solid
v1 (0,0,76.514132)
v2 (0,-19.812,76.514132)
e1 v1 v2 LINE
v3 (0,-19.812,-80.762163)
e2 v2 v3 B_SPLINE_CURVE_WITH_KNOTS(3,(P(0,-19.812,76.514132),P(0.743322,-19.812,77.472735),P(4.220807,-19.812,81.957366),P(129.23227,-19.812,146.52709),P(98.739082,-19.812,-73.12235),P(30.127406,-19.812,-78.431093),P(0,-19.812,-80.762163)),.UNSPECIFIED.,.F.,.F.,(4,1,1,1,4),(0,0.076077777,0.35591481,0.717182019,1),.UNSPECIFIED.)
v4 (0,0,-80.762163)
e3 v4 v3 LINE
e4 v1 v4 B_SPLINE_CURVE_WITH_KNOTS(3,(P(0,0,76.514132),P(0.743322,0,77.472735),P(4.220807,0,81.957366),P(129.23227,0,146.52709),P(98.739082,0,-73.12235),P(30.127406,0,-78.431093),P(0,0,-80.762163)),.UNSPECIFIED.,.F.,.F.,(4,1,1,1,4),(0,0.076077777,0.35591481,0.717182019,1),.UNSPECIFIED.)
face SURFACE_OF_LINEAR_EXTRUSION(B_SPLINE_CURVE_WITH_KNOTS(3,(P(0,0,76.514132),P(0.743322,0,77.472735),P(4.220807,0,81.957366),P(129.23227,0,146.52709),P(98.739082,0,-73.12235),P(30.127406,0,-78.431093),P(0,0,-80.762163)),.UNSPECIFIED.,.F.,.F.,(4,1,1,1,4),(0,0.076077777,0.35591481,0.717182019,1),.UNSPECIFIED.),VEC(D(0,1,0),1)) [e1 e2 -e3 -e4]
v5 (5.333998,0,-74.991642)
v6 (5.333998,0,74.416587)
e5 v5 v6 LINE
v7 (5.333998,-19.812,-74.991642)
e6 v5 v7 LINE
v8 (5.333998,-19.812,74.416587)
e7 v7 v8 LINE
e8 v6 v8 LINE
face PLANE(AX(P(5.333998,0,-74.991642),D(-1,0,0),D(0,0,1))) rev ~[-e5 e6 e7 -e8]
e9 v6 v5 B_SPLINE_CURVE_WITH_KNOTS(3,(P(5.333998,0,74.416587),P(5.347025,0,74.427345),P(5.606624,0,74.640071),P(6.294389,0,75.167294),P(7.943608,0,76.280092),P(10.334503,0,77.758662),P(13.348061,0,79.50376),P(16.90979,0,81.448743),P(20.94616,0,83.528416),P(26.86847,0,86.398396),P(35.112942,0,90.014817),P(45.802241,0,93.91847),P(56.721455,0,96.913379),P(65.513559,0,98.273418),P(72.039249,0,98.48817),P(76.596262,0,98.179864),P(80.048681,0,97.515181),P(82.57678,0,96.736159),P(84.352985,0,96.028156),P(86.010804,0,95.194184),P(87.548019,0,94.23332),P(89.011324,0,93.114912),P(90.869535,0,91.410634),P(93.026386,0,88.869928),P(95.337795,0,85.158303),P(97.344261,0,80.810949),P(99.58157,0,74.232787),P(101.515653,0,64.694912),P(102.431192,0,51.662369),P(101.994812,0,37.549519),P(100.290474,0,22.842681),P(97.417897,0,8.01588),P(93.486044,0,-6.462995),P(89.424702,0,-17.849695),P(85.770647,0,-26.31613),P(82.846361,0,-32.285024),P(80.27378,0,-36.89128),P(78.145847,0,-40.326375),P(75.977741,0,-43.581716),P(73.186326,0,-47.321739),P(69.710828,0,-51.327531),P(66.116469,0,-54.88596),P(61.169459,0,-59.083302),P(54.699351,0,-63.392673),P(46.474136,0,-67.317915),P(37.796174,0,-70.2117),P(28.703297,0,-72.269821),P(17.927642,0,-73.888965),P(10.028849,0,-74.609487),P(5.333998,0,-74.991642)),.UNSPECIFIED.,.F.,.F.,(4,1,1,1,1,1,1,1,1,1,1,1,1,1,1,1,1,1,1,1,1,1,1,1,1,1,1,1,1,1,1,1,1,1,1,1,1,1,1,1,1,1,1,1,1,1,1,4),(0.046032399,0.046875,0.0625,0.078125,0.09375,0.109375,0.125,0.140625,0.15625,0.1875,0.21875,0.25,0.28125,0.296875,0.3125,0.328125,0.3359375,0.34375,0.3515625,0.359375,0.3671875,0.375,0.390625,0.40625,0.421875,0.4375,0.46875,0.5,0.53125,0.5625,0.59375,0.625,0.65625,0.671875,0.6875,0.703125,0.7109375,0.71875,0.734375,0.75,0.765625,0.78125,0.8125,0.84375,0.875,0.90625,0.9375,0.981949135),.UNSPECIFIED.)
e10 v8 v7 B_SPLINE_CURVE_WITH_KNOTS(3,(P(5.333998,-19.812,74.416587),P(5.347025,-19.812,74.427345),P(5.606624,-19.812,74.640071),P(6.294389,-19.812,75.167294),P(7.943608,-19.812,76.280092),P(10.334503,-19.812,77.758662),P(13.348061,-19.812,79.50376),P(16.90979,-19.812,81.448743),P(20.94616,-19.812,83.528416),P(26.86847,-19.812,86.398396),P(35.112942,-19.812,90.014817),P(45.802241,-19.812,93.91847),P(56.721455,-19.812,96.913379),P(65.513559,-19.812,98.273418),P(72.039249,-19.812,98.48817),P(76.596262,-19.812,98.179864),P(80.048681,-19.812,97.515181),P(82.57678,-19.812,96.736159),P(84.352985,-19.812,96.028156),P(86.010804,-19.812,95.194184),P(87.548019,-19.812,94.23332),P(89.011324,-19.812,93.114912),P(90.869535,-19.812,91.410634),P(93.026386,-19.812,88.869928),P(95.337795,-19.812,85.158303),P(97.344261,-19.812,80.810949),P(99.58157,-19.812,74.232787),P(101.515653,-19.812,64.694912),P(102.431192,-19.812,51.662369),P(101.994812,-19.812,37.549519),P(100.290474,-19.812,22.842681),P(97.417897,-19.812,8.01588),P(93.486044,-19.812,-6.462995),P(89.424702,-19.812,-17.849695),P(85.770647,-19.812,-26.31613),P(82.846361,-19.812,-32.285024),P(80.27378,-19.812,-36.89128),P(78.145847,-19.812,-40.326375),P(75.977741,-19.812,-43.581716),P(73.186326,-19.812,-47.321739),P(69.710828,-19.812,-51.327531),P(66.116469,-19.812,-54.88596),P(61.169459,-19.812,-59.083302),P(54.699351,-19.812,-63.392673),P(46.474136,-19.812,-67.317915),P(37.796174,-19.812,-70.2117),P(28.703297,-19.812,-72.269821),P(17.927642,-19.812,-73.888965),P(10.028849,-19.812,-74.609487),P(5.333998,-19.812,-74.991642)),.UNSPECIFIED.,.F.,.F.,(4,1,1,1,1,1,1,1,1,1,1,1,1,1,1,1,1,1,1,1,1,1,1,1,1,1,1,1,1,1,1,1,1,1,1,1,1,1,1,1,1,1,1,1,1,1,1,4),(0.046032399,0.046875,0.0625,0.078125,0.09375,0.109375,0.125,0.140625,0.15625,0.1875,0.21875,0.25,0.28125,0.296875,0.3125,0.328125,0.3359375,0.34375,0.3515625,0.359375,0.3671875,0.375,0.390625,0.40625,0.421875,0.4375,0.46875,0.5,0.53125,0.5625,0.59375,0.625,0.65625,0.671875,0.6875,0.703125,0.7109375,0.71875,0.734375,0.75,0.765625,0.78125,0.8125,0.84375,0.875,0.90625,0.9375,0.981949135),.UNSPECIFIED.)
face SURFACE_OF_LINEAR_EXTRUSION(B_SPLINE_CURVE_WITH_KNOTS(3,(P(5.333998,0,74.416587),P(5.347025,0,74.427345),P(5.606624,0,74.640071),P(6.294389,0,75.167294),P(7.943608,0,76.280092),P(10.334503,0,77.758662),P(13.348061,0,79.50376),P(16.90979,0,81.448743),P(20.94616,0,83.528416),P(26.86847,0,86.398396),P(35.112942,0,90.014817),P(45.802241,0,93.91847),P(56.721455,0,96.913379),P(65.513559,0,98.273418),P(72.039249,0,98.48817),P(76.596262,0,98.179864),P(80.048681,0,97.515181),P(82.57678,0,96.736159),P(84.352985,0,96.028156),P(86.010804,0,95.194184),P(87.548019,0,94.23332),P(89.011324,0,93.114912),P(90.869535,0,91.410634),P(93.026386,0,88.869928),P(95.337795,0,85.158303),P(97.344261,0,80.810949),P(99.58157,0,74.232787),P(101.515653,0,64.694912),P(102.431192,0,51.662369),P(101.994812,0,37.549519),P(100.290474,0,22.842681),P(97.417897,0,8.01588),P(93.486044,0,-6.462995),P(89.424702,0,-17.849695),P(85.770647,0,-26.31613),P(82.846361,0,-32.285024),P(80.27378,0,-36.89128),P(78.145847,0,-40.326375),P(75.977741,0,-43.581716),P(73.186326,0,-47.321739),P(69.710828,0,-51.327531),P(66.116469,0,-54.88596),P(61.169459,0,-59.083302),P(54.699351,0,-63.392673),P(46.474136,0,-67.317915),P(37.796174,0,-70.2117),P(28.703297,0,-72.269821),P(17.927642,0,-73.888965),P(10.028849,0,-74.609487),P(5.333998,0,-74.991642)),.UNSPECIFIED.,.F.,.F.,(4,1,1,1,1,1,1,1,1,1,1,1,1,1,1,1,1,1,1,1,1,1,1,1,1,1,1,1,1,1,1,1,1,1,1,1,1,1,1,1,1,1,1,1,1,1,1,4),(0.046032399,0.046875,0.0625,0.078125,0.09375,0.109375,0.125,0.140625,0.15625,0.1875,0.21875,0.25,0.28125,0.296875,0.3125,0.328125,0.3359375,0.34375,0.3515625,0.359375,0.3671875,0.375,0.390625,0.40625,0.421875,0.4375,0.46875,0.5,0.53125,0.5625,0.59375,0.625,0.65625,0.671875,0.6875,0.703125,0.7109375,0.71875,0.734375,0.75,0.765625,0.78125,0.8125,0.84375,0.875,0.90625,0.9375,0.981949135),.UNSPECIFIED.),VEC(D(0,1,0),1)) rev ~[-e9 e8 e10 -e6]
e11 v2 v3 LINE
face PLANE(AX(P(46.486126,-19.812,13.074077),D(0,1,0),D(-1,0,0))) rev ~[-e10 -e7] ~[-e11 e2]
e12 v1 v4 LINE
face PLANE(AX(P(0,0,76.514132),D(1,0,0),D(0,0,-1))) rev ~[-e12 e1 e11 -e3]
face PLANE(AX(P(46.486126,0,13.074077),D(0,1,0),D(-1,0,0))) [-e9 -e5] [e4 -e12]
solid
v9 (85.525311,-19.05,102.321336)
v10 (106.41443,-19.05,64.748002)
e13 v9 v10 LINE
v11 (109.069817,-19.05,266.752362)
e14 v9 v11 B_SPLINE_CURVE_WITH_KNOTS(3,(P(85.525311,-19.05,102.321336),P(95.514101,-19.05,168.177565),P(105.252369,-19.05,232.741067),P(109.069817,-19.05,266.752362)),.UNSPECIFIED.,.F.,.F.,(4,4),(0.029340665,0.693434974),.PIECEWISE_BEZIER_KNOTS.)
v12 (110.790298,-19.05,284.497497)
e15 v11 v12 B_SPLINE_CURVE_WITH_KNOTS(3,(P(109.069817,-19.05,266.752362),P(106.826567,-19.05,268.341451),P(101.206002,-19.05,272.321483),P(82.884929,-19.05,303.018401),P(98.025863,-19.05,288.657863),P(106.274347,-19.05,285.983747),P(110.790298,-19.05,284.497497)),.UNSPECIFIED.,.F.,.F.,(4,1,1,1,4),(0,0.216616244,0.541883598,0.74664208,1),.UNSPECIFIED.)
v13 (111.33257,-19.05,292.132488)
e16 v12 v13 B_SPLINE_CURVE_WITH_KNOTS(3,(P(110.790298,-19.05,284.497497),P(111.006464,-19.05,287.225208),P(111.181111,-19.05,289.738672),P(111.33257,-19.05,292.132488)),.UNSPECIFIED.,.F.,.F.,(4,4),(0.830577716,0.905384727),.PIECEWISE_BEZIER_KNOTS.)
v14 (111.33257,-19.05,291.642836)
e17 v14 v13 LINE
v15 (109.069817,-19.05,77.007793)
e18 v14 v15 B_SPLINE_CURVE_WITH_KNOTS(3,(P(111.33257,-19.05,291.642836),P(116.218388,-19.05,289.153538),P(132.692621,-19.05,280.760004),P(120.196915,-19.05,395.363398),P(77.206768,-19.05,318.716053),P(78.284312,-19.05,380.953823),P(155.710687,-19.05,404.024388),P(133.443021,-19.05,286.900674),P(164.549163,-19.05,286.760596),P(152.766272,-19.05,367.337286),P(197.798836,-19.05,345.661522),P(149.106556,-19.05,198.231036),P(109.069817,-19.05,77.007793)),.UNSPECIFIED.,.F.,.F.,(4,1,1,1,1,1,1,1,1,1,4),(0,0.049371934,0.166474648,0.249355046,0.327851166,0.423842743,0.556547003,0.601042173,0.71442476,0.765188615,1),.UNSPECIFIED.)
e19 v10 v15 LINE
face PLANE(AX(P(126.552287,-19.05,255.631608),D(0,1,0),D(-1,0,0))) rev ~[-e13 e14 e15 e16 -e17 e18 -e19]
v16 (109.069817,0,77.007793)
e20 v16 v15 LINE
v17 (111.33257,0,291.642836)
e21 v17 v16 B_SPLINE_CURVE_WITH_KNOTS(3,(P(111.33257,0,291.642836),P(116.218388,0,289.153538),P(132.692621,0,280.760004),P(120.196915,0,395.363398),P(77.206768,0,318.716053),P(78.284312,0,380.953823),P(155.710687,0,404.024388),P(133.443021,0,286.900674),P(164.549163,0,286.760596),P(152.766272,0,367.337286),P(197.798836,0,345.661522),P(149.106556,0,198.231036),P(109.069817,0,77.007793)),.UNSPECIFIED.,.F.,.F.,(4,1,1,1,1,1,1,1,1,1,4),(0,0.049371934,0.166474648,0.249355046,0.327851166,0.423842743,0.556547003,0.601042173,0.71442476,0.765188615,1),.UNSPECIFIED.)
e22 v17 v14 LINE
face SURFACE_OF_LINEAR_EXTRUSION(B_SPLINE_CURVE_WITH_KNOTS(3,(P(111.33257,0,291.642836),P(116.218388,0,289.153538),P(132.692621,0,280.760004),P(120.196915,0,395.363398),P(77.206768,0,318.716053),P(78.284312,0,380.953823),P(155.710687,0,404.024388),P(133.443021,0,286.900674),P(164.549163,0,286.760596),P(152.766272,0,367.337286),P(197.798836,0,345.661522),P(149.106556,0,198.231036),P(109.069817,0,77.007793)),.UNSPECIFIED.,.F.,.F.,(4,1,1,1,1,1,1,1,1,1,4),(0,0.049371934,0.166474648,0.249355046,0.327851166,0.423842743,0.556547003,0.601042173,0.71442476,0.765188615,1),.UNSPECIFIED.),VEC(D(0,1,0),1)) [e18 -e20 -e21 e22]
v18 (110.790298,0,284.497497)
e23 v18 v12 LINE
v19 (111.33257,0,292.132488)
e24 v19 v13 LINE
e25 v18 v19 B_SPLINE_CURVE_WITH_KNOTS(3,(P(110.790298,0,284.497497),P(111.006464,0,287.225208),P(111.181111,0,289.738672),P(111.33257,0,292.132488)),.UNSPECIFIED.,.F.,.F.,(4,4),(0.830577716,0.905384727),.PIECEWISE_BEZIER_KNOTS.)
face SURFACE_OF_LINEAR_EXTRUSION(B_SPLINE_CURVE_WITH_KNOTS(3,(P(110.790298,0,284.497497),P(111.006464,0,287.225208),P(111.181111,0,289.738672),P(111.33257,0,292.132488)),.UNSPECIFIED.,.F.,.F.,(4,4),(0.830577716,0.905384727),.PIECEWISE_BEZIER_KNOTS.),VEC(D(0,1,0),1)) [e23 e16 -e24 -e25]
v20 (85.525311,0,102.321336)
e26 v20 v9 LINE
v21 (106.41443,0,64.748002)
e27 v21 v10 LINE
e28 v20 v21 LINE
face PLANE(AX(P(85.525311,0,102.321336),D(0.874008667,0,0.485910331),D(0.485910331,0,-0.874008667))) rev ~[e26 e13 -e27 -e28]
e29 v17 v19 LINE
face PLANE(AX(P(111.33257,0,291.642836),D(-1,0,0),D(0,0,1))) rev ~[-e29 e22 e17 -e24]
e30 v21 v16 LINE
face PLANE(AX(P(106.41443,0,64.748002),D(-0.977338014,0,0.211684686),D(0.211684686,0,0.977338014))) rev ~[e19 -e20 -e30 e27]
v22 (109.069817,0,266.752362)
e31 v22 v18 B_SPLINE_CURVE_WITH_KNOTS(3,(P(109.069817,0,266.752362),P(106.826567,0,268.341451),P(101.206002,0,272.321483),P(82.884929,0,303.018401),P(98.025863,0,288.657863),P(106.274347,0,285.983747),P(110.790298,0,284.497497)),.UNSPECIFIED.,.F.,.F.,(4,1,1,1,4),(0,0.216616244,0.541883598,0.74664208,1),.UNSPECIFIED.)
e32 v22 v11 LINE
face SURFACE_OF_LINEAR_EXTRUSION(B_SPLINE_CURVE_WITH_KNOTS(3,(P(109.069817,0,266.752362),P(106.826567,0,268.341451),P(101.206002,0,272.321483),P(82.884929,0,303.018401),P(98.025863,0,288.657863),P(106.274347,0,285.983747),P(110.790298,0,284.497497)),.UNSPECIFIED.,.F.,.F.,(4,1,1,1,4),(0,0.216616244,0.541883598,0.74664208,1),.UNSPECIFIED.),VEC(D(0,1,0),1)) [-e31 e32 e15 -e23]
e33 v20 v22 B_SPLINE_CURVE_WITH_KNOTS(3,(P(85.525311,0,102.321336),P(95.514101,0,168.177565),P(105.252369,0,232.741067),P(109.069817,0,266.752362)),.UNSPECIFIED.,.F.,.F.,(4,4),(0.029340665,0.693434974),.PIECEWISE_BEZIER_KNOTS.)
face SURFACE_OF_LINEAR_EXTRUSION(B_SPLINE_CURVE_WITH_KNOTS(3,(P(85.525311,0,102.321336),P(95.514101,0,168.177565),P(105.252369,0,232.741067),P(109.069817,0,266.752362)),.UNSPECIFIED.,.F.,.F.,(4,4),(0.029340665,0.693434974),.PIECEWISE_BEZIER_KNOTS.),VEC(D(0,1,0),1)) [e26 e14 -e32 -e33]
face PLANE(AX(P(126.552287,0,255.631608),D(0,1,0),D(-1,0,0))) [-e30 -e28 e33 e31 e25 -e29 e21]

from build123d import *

# Parameters (mm, degrees)
F1_DEPTH = 19.812
F3_DEPTH = 19.05


# Not quite as in the source:
# - ends of sketch curves that miss each other by under 0.0002 mm in the source are joined
# - the dataset's text gives a spline's control points without its knots; the knots are read off the source's solid


with BuildPart() as f1:
    # F0 (on Front) → F1 (new body)
    with BuildSketch(Plane.XZ):
        with BuildLine():
            add(Edge.make_bspline(
                [(0, 76.5141323209), (0.7433221206, 77.4727347098), (4.2208074345, 81.9573661192), (129.2322701811, 146.527090065), (98.7390819728, -73.1223504124), (30.127405598, -78.4310926545), (0, -80.7621628046)],
                knots=[0, 0, 0, 0, 0.0760777767, 0.3559148097, 0.7171820192, 1, 1, 1, 1], degree=3))
            Line((0, 76.5141323209), (0, -80.7621628046))
        make_face()
        with BuildLine():
            Line((5.3339975098, -74.9916417322), (5.3339975098, 74.4165874588))
            add(Edge.make_bspline(
                [(5.3339975098, 74.4165874588), (5.3470249016, 74.4273445717), (5.6066241481, 74.6400712104), (6.2943893902, 75.1672938136), (7.9436076535, 76.2800916687), (10.3345031542, 77.7586623382), (13.3480605318, 79.5037600845), (16.9097897451, 81.4487427766), (20.9461603408, 83.5284163342), (26.8684700965, 86.3983964826), (35.1129418117, 90.0148169838), (45.802240754, 93.9184695492), (56.7214553983, 96.9133785696), (65.5135589605, 98.2734182055), (72.0392493825, 98.4881698363), (76.5962624569, 98.1798640517), (80.0486810116, 97.5151806004), (82.5767801734, 96.7361592063), (84.3529852227, 96.0281556728), (86.0108043388, 95.194183623), (87.5480188561, 94.2333202416), (89.0113238405, 93.1149119401), (90.8695346792, 91.4106340766), (93.0263860403, 88.8699280435), (95.3377948251, 85.1583031161), (97.3442614407, 80.8109493537), (99.5815704989, 74.2327874747), (101.5156534269, 64.694911683), (102.4311923361, 51.6623687521), (101.9948122772, 37.5495193287), (100.2904737, 22.8426813505), (97.4178971715, 8.0158800552), (93.4860440929, -6.4629949473), (89.4247018298, -17.8496950984), (85.7706469294, -26.3161297311), (82.8463610758, -32.2850243572), (80.2737801468, -36.8912798472), (78.1458469019, -40.3263748531), (75.9777410144, -43.5817156034), (73.1863258727, -47.3217394843), (69.7108276375, -51.327530526), (66.1164687408, -54.8859598532), (61.1694589608, -59.0833016592), (54.6993512581, -63.3926734884), (46.4741355911, -67.3179154699), (37.7961742848, -70.2117000663), (28.7032965731, -72.2698208225), (17.9276416684, -73.8889650128), (10.0288493535, -74.6094872809), (5.3339975098, -74.9916417322)],
                knots=[0.0460323986, 0.0460323986, 0.0460323986, 0.0460323986, 0.046875, 0.0625, 0.078125, 0.09375, 0.109375, 0.125, 0.140625, 0.15625, 0.1875, 0.21875, 0.25, 0.28125, 0.296875, 0.3125, 0.328125, 0.3359375, 0.34375, 0.3515625, 0.359375, 0.3671875, 0.375, 0.390625, 0.40625, 0.421875, 0.4375, 0.46875, 0.5, 0.53125, 0.5625, 0.59375, 0.625, 0.65625, 0.671875, 0.6875, 0.703125, 0.7109375, 0.71875, 0.734375, 0.75, 0.765625, 0.78125, 0.8125, 0.84375, 0.875, 0.90625, 0.9375, 0.9819491349, 0.9819491349, 0.9819491349, 0.9819491349], degree=3))
        make_face(mode=Mode.SUBTRACT)
    extrude(amount=F1_DEPTH)


with BuildPart() as f3:
    # F2 (on Front) → F3 (new body)
    with BuildSketch(Plane.XZ):
        with BuildLine():
            add(Edge.make_bspline(
                [(85.5253111922, 102.321335835), (95.5141012767, 168.1775650877), (105.2523692318, 232.7410673995), (109.0698167682, 266.7523622513)],
                knots=[0.0293406646, 0.0293406646, 0.0293406646, 0.0293406646, 0.6934349742, 0.6934349742, 0.6934349742, 0.6934349742], degree=3))
            Line((85.5253111922, 102.321335835), (106.4144303967, 64.7480017278))
            Line((106.4144303967, 64.7480017278), (109.0698167682, 77.0077928901))
            add(Edge.make_bspline(
                [(111.3325704752, 291.6428361883), (116.2183880723, 289.1535381797), (132.6926214708, 280.7600041238), (120.1969146902, 395.3633975273), (77.2067683812, 318.716053131), (78.2843117922, 380.9538231452), (155.710687236, 404.0243883285), (133.4430208753, 286.9006741327), (164.5491628787, 286.7605963446), (152.7662718006, 367.33728622), (197.7988355016, 345.6615215019), (149.1065563473, 198.2310355557), (109.0698167682, 77.0077928901)],
                knots=[0, 0, 0, 0, 0.0493719341, 0.1664746483, 0.249355046, 0.3278511656, 0.4238427426, 0.5565470026, 0.6010421731, 0.7144247599, 0.7651886148, 1, 1, 1, 1], degree=3))
            Line((111.3325704752, 291.6428361883), (111.3325704752, 292.1324876105))
            add(Edge.make_bspline(
                [(110.7902975697, 284.4974967904), (111.0064640685, 287.2252080961), (111.1811108001, 289.738671975), (111.3325704752, 292.1324876105)],
                knots=[0.8305777158, 0.8305777158, 0.8305777158, 0.8305777158, 0.9053847275, 0.9053847275, 0.9053847275, 0.9053847275], degree=3))
            add(Edge.make_bspline(
                [(109.0698167682, 266.7523622513), (109.8581614557, 273.776066797), (110.3940022811, 279.4968184009), (110.7902975697, 284.4974967904)],
                knots=[0.6934349742, 0.6934349742, 0.6934349742, 0.6934349742, 0.8305777158, 0.8305777158, 0.8305777158, 0.8305777158], degree=3))
        make_face()
        with BuildLine():
            add(Edge.make_bspline(
                [(109.0698167682, 266.7523622513), (106.8265668797, 268.3414508562), (101.2060018924, 272.3214832246), (82.8849286861, 303.0184006742), (98.0258633232, 288.657863336), (106.2743468489, 285.9837473117), (110.7902975697, 284.4974967904)],
                knots=[0, 0, 0, 0, 0.2166162443, 0.5418835978, 0.7466420799, 1, 1, 1, 1], degree=3))
            add(Edge.make_bspline(
                [(109.0698167682, 266.7523622513), (109.8581614557, 273.776066797), (110.3940022811, 279.4968184009), (110.7902975697, 284.4974967904)],
                knots=[0.6934349742, 0.6934349742, 0.6934349742, 0.6934349742, 0.8305777158, 0.8305777158, 0.8305777158, 0.8305777158], degree=3))
        make_face()
    extrude(amount=F3_DEPTH)


solid = Compound([f1.part, f3.part])
